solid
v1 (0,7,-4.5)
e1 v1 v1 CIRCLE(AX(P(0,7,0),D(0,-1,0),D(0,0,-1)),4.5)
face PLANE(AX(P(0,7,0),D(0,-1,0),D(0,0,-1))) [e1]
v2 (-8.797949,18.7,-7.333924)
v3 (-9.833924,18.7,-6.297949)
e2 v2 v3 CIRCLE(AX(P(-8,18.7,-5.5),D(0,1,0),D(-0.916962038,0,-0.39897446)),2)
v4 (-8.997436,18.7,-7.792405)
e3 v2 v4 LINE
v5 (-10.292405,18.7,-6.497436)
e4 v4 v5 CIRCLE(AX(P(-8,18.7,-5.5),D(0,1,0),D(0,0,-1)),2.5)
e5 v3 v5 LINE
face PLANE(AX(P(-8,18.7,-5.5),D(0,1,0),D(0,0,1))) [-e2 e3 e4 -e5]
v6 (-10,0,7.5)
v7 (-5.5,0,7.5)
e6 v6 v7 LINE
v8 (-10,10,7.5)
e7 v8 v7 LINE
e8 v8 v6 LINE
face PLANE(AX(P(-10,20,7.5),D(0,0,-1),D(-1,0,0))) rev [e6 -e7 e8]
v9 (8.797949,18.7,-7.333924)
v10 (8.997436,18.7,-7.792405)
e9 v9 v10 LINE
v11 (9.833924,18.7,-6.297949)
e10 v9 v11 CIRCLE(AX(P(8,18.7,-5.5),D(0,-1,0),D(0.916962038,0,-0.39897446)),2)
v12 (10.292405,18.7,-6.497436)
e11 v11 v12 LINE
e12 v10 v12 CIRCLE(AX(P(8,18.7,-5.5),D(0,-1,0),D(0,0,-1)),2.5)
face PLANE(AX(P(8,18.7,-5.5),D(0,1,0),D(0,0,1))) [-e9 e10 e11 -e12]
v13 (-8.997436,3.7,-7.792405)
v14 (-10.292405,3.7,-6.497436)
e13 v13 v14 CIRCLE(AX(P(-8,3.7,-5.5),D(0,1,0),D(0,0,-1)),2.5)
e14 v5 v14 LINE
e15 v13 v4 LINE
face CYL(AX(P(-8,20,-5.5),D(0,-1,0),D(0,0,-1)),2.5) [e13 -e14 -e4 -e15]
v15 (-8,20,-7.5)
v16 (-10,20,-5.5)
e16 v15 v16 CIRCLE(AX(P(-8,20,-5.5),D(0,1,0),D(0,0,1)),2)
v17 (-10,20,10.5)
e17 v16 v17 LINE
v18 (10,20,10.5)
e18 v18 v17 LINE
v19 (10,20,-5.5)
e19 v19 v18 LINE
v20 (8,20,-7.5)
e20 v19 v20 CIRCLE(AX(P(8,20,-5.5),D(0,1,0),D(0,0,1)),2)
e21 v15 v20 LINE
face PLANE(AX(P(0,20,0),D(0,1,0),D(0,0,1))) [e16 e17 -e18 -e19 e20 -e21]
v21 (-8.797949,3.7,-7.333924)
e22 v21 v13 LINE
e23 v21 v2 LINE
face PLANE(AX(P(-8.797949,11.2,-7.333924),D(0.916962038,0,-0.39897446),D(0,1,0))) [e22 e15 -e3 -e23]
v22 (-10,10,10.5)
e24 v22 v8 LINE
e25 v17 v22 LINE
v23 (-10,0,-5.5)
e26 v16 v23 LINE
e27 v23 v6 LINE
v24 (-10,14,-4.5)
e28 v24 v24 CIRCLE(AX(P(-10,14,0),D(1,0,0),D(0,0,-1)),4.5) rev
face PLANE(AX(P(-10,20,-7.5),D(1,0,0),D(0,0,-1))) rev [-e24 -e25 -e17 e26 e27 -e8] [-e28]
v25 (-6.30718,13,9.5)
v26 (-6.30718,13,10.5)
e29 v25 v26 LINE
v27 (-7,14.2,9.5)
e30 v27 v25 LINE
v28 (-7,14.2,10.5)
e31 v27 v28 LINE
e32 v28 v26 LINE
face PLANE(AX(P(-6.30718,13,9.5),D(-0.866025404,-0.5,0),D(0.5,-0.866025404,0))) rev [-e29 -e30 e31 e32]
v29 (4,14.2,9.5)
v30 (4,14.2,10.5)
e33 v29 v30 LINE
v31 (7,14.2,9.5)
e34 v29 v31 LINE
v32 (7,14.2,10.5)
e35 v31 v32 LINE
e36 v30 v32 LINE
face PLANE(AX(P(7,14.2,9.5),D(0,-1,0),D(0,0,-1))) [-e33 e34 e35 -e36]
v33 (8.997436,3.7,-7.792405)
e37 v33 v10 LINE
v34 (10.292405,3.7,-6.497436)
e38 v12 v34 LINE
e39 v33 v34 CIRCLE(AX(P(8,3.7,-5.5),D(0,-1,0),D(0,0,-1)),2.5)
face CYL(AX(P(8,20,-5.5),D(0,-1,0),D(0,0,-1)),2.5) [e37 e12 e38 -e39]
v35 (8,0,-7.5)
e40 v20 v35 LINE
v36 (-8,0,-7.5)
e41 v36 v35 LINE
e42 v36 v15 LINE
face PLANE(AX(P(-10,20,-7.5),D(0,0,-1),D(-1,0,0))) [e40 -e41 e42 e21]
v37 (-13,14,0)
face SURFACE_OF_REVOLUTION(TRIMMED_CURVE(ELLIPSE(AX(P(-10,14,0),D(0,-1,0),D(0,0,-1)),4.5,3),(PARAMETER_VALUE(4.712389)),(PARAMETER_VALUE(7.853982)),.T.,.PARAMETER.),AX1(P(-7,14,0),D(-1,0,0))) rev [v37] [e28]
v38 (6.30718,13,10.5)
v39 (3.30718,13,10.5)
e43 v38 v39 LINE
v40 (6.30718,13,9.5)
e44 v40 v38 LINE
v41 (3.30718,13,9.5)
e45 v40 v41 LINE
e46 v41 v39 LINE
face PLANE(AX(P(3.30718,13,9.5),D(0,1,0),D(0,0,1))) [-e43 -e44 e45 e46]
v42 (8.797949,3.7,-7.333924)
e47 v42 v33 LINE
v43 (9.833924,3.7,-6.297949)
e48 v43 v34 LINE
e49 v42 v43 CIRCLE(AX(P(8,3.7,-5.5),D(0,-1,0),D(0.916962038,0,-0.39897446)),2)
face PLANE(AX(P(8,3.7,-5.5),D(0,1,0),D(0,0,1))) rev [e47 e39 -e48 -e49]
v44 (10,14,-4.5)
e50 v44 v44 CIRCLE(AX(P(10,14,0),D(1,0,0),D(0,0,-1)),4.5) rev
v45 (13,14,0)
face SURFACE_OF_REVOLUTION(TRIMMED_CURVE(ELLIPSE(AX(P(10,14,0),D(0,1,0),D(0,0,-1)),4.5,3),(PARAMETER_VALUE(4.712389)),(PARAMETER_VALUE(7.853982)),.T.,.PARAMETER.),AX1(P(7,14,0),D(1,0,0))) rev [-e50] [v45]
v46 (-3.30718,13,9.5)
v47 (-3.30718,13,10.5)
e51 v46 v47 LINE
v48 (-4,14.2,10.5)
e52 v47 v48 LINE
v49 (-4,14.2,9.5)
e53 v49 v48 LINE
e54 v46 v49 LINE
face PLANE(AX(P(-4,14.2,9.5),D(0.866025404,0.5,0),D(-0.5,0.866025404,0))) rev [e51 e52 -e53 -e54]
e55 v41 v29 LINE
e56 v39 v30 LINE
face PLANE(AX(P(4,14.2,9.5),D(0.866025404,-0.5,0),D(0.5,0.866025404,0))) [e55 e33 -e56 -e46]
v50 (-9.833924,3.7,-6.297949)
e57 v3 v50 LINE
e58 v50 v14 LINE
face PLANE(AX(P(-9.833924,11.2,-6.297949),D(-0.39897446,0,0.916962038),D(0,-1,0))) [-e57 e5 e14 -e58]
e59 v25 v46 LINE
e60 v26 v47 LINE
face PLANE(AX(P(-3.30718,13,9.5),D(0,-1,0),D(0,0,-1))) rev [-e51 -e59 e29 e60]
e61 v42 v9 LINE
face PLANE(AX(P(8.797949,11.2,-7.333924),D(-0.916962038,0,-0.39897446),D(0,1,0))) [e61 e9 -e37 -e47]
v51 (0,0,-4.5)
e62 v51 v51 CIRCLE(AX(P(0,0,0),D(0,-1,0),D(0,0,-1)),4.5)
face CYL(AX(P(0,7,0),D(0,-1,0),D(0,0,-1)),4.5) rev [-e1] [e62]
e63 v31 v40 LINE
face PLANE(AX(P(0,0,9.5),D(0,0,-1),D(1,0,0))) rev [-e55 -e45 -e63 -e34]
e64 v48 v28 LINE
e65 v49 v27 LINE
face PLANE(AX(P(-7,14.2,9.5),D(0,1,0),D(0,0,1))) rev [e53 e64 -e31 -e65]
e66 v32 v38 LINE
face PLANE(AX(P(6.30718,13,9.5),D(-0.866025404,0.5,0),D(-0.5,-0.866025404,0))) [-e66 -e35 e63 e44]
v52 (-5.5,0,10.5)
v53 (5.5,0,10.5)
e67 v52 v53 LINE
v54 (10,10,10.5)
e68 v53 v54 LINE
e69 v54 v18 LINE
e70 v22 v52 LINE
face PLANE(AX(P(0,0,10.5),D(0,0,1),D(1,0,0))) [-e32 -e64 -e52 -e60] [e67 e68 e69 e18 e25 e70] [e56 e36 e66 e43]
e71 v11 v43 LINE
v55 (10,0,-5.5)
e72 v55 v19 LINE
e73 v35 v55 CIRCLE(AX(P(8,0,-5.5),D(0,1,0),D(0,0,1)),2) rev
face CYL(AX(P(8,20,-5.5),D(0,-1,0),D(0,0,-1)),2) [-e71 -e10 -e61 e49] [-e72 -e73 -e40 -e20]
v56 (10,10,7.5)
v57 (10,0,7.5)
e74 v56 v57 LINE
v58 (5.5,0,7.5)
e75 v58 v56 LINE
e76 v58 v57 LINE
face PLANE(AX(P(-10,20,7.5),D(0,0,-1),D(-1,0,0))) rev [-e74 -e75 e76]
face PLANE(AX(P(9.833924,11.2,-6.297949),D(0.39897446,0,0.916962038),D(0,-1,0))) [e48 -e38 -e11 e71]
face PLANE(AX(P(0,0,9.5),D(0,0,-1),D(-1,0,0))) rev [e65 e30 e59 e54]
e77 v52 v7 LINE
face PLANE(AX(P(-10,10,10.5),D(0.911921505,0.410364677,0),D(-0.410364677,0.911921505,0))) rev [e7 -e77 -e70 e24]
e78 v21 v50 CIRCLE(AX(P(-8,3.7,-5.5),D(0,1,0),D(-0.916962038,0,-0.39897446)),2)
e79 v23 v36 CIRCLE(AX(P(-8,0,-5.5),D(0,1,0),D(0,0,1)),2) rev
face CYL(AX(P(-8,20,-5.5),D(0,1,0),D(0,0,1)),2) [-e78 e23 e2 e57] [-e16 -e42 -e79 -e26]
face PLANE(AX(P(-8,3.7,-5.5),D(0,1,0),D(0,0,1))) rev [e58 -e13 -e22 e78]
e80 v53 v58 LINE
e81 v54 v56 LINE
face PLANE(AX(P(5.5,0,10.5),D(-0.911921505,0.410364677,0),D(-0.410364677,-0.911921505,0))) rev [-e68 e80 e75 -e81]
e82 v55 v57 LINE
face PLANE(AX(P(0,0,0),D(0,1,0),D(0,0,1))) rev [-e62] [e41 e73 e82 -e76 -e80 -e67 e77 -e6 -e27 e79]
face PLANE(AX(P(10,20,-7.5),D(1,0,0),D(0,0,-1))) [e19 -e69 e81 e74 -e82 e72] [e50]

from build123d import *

# Parameters (mm, degrees)
SKETCH1_W           = 20
SKETCH1_H           = 15
BOSS_EXTRUDE1_DEPTH = 20
SKETCH2_R           = 4.5
CUT_EXTRUDE1_DEPTH  = 7
BOSS_EXTRUDE2_DEPTH = 3
CUT_EXTRUDE4_DEPTH  = 1
FILLET1_R           = 2
WRAP1_SECTION_W     = 0.5
WRAP1_SECTION_H     = 15
WRAP1_ANGLE         = 42.971834635


# Read off the part's stored shape, not the designer's step: Dome1
with BuildPart() as part:
    # Sketch1 → Boss-Extrude1 (new body)
    with BuildSketch(Plane(origin=(0, 0, 0), x_dir=(1, 0, 0), z_dir=(0, 1, 0))):
        Rectangle(SKETCH1_W, SKETCH1_H)
    extrude(amount=BOSS_EXTRUDE1_DEPTH)

    # Sketch2 → Cut-Extrude1 (cut)
    with BuildSketch(Plane.XZ):
        with Locations(Location((0, 0, 0), (0, 0, 270))):
            Circle(SKETCH2_R)
    extrude(amount=-CUT_EXTRUDE1_DEPTH, mode=Mode.SUBTRACT)

    # Sketch3 → Boss-Extrude2 (add)
    with BuildSketch(Plane.XY.offset(7.5)):
        Polygon((-10, 20), (-10, 10), (-5.5, 0), (5.5, 0), (10, 10), (10, 20), align=None)
    extrude(amount=BOSS_EXTRUDE2_DEPTH)

    # Sketch5 → Cut-Extrude4 (cut)
    with BuildSketch(Plane.XY.offset(10.5)):
        Polygon((-7, 14.2), (-4, 14.2), (-3.307179677, 13), (-6.307179677, 13), align=None)
    cut_extrude4 = extrude(amount=-CUT_EXTRUDE4_DEPTH, mode=Mode.SUBTRACT)

    # Mirror2: Cut-Extrude4 across plane
    add(cut_extrude4.mirror(Plane(origin=(0, 0, 0), x_dir=(0, 0, 1), z_dir=(1, 0, 0))), mode=Mode.SUBTRACT)

    # Dome1 outline → Dome1 (revolve)
    with BuildSketch(Plane(origin=(0, 14, 0), x_dir=(0, 1, 0), z_dir=(0, 0, -1))):
        with BuildLine():
            Line((0, -9.9999999), (0, -13))
            add(Edge.make_bspline(
                [(0, -13), (4.5, -13), (4.5, -10)],
                knots=[4.71238898, 4.71238898, 4.71238898, 6.283185307, 6.283185307, 6.283185307], degree=2, weights=[1, 0.707106781, 1]))
            Line((4.5, -10), (0, -9.9999999))
        make_face()
    dome1 = revolve(axis=Axis((0, 14, 0), (1, 0, 0)))

    # Mirror7: Dome1 across plane
    add(dome1.mirror(Plane(origin=(0, 0, 0), x_dir=(0, 0, 1), z_dir=(1, 0, 0))))

    # Fillet1
    fillet1_edges = [part.edges().sort_by_distance(p)[0] for p in [
        (-10, 10, -7.5),
        (10, 10, -7.5),
    ]]
    fillet(fillet1_edges, radius=FILLET1_R)

    # Wrap1 section (on wrap section) → Wrap1 (revolve)
    with BuildSketch(Plane(origin=(8, 0, -5.5), x_dir=(0.9169620384790573, 0, -0.39897446032087286), z_dir=(0.39897446032087286, 0, 0.9169620384790573))):
        with Locations((2.25, 11.2)):
            Rectangle(WRAP1_SECTION_W, WRAP1_SECTION_H)
    wrap1 = revolve(axis=Axis((8, 0, -5.5), (0, 1, 0)), revolution_arc=WRAP1_ANGLE)

    # Mirror9: Wrap1 across plane
    add(wrap1.mirror(Plane(origin=(0, 0, 0), x_dir=(0, 0, 1), z_dir=(1, 0, 0))))


solid = part.part
